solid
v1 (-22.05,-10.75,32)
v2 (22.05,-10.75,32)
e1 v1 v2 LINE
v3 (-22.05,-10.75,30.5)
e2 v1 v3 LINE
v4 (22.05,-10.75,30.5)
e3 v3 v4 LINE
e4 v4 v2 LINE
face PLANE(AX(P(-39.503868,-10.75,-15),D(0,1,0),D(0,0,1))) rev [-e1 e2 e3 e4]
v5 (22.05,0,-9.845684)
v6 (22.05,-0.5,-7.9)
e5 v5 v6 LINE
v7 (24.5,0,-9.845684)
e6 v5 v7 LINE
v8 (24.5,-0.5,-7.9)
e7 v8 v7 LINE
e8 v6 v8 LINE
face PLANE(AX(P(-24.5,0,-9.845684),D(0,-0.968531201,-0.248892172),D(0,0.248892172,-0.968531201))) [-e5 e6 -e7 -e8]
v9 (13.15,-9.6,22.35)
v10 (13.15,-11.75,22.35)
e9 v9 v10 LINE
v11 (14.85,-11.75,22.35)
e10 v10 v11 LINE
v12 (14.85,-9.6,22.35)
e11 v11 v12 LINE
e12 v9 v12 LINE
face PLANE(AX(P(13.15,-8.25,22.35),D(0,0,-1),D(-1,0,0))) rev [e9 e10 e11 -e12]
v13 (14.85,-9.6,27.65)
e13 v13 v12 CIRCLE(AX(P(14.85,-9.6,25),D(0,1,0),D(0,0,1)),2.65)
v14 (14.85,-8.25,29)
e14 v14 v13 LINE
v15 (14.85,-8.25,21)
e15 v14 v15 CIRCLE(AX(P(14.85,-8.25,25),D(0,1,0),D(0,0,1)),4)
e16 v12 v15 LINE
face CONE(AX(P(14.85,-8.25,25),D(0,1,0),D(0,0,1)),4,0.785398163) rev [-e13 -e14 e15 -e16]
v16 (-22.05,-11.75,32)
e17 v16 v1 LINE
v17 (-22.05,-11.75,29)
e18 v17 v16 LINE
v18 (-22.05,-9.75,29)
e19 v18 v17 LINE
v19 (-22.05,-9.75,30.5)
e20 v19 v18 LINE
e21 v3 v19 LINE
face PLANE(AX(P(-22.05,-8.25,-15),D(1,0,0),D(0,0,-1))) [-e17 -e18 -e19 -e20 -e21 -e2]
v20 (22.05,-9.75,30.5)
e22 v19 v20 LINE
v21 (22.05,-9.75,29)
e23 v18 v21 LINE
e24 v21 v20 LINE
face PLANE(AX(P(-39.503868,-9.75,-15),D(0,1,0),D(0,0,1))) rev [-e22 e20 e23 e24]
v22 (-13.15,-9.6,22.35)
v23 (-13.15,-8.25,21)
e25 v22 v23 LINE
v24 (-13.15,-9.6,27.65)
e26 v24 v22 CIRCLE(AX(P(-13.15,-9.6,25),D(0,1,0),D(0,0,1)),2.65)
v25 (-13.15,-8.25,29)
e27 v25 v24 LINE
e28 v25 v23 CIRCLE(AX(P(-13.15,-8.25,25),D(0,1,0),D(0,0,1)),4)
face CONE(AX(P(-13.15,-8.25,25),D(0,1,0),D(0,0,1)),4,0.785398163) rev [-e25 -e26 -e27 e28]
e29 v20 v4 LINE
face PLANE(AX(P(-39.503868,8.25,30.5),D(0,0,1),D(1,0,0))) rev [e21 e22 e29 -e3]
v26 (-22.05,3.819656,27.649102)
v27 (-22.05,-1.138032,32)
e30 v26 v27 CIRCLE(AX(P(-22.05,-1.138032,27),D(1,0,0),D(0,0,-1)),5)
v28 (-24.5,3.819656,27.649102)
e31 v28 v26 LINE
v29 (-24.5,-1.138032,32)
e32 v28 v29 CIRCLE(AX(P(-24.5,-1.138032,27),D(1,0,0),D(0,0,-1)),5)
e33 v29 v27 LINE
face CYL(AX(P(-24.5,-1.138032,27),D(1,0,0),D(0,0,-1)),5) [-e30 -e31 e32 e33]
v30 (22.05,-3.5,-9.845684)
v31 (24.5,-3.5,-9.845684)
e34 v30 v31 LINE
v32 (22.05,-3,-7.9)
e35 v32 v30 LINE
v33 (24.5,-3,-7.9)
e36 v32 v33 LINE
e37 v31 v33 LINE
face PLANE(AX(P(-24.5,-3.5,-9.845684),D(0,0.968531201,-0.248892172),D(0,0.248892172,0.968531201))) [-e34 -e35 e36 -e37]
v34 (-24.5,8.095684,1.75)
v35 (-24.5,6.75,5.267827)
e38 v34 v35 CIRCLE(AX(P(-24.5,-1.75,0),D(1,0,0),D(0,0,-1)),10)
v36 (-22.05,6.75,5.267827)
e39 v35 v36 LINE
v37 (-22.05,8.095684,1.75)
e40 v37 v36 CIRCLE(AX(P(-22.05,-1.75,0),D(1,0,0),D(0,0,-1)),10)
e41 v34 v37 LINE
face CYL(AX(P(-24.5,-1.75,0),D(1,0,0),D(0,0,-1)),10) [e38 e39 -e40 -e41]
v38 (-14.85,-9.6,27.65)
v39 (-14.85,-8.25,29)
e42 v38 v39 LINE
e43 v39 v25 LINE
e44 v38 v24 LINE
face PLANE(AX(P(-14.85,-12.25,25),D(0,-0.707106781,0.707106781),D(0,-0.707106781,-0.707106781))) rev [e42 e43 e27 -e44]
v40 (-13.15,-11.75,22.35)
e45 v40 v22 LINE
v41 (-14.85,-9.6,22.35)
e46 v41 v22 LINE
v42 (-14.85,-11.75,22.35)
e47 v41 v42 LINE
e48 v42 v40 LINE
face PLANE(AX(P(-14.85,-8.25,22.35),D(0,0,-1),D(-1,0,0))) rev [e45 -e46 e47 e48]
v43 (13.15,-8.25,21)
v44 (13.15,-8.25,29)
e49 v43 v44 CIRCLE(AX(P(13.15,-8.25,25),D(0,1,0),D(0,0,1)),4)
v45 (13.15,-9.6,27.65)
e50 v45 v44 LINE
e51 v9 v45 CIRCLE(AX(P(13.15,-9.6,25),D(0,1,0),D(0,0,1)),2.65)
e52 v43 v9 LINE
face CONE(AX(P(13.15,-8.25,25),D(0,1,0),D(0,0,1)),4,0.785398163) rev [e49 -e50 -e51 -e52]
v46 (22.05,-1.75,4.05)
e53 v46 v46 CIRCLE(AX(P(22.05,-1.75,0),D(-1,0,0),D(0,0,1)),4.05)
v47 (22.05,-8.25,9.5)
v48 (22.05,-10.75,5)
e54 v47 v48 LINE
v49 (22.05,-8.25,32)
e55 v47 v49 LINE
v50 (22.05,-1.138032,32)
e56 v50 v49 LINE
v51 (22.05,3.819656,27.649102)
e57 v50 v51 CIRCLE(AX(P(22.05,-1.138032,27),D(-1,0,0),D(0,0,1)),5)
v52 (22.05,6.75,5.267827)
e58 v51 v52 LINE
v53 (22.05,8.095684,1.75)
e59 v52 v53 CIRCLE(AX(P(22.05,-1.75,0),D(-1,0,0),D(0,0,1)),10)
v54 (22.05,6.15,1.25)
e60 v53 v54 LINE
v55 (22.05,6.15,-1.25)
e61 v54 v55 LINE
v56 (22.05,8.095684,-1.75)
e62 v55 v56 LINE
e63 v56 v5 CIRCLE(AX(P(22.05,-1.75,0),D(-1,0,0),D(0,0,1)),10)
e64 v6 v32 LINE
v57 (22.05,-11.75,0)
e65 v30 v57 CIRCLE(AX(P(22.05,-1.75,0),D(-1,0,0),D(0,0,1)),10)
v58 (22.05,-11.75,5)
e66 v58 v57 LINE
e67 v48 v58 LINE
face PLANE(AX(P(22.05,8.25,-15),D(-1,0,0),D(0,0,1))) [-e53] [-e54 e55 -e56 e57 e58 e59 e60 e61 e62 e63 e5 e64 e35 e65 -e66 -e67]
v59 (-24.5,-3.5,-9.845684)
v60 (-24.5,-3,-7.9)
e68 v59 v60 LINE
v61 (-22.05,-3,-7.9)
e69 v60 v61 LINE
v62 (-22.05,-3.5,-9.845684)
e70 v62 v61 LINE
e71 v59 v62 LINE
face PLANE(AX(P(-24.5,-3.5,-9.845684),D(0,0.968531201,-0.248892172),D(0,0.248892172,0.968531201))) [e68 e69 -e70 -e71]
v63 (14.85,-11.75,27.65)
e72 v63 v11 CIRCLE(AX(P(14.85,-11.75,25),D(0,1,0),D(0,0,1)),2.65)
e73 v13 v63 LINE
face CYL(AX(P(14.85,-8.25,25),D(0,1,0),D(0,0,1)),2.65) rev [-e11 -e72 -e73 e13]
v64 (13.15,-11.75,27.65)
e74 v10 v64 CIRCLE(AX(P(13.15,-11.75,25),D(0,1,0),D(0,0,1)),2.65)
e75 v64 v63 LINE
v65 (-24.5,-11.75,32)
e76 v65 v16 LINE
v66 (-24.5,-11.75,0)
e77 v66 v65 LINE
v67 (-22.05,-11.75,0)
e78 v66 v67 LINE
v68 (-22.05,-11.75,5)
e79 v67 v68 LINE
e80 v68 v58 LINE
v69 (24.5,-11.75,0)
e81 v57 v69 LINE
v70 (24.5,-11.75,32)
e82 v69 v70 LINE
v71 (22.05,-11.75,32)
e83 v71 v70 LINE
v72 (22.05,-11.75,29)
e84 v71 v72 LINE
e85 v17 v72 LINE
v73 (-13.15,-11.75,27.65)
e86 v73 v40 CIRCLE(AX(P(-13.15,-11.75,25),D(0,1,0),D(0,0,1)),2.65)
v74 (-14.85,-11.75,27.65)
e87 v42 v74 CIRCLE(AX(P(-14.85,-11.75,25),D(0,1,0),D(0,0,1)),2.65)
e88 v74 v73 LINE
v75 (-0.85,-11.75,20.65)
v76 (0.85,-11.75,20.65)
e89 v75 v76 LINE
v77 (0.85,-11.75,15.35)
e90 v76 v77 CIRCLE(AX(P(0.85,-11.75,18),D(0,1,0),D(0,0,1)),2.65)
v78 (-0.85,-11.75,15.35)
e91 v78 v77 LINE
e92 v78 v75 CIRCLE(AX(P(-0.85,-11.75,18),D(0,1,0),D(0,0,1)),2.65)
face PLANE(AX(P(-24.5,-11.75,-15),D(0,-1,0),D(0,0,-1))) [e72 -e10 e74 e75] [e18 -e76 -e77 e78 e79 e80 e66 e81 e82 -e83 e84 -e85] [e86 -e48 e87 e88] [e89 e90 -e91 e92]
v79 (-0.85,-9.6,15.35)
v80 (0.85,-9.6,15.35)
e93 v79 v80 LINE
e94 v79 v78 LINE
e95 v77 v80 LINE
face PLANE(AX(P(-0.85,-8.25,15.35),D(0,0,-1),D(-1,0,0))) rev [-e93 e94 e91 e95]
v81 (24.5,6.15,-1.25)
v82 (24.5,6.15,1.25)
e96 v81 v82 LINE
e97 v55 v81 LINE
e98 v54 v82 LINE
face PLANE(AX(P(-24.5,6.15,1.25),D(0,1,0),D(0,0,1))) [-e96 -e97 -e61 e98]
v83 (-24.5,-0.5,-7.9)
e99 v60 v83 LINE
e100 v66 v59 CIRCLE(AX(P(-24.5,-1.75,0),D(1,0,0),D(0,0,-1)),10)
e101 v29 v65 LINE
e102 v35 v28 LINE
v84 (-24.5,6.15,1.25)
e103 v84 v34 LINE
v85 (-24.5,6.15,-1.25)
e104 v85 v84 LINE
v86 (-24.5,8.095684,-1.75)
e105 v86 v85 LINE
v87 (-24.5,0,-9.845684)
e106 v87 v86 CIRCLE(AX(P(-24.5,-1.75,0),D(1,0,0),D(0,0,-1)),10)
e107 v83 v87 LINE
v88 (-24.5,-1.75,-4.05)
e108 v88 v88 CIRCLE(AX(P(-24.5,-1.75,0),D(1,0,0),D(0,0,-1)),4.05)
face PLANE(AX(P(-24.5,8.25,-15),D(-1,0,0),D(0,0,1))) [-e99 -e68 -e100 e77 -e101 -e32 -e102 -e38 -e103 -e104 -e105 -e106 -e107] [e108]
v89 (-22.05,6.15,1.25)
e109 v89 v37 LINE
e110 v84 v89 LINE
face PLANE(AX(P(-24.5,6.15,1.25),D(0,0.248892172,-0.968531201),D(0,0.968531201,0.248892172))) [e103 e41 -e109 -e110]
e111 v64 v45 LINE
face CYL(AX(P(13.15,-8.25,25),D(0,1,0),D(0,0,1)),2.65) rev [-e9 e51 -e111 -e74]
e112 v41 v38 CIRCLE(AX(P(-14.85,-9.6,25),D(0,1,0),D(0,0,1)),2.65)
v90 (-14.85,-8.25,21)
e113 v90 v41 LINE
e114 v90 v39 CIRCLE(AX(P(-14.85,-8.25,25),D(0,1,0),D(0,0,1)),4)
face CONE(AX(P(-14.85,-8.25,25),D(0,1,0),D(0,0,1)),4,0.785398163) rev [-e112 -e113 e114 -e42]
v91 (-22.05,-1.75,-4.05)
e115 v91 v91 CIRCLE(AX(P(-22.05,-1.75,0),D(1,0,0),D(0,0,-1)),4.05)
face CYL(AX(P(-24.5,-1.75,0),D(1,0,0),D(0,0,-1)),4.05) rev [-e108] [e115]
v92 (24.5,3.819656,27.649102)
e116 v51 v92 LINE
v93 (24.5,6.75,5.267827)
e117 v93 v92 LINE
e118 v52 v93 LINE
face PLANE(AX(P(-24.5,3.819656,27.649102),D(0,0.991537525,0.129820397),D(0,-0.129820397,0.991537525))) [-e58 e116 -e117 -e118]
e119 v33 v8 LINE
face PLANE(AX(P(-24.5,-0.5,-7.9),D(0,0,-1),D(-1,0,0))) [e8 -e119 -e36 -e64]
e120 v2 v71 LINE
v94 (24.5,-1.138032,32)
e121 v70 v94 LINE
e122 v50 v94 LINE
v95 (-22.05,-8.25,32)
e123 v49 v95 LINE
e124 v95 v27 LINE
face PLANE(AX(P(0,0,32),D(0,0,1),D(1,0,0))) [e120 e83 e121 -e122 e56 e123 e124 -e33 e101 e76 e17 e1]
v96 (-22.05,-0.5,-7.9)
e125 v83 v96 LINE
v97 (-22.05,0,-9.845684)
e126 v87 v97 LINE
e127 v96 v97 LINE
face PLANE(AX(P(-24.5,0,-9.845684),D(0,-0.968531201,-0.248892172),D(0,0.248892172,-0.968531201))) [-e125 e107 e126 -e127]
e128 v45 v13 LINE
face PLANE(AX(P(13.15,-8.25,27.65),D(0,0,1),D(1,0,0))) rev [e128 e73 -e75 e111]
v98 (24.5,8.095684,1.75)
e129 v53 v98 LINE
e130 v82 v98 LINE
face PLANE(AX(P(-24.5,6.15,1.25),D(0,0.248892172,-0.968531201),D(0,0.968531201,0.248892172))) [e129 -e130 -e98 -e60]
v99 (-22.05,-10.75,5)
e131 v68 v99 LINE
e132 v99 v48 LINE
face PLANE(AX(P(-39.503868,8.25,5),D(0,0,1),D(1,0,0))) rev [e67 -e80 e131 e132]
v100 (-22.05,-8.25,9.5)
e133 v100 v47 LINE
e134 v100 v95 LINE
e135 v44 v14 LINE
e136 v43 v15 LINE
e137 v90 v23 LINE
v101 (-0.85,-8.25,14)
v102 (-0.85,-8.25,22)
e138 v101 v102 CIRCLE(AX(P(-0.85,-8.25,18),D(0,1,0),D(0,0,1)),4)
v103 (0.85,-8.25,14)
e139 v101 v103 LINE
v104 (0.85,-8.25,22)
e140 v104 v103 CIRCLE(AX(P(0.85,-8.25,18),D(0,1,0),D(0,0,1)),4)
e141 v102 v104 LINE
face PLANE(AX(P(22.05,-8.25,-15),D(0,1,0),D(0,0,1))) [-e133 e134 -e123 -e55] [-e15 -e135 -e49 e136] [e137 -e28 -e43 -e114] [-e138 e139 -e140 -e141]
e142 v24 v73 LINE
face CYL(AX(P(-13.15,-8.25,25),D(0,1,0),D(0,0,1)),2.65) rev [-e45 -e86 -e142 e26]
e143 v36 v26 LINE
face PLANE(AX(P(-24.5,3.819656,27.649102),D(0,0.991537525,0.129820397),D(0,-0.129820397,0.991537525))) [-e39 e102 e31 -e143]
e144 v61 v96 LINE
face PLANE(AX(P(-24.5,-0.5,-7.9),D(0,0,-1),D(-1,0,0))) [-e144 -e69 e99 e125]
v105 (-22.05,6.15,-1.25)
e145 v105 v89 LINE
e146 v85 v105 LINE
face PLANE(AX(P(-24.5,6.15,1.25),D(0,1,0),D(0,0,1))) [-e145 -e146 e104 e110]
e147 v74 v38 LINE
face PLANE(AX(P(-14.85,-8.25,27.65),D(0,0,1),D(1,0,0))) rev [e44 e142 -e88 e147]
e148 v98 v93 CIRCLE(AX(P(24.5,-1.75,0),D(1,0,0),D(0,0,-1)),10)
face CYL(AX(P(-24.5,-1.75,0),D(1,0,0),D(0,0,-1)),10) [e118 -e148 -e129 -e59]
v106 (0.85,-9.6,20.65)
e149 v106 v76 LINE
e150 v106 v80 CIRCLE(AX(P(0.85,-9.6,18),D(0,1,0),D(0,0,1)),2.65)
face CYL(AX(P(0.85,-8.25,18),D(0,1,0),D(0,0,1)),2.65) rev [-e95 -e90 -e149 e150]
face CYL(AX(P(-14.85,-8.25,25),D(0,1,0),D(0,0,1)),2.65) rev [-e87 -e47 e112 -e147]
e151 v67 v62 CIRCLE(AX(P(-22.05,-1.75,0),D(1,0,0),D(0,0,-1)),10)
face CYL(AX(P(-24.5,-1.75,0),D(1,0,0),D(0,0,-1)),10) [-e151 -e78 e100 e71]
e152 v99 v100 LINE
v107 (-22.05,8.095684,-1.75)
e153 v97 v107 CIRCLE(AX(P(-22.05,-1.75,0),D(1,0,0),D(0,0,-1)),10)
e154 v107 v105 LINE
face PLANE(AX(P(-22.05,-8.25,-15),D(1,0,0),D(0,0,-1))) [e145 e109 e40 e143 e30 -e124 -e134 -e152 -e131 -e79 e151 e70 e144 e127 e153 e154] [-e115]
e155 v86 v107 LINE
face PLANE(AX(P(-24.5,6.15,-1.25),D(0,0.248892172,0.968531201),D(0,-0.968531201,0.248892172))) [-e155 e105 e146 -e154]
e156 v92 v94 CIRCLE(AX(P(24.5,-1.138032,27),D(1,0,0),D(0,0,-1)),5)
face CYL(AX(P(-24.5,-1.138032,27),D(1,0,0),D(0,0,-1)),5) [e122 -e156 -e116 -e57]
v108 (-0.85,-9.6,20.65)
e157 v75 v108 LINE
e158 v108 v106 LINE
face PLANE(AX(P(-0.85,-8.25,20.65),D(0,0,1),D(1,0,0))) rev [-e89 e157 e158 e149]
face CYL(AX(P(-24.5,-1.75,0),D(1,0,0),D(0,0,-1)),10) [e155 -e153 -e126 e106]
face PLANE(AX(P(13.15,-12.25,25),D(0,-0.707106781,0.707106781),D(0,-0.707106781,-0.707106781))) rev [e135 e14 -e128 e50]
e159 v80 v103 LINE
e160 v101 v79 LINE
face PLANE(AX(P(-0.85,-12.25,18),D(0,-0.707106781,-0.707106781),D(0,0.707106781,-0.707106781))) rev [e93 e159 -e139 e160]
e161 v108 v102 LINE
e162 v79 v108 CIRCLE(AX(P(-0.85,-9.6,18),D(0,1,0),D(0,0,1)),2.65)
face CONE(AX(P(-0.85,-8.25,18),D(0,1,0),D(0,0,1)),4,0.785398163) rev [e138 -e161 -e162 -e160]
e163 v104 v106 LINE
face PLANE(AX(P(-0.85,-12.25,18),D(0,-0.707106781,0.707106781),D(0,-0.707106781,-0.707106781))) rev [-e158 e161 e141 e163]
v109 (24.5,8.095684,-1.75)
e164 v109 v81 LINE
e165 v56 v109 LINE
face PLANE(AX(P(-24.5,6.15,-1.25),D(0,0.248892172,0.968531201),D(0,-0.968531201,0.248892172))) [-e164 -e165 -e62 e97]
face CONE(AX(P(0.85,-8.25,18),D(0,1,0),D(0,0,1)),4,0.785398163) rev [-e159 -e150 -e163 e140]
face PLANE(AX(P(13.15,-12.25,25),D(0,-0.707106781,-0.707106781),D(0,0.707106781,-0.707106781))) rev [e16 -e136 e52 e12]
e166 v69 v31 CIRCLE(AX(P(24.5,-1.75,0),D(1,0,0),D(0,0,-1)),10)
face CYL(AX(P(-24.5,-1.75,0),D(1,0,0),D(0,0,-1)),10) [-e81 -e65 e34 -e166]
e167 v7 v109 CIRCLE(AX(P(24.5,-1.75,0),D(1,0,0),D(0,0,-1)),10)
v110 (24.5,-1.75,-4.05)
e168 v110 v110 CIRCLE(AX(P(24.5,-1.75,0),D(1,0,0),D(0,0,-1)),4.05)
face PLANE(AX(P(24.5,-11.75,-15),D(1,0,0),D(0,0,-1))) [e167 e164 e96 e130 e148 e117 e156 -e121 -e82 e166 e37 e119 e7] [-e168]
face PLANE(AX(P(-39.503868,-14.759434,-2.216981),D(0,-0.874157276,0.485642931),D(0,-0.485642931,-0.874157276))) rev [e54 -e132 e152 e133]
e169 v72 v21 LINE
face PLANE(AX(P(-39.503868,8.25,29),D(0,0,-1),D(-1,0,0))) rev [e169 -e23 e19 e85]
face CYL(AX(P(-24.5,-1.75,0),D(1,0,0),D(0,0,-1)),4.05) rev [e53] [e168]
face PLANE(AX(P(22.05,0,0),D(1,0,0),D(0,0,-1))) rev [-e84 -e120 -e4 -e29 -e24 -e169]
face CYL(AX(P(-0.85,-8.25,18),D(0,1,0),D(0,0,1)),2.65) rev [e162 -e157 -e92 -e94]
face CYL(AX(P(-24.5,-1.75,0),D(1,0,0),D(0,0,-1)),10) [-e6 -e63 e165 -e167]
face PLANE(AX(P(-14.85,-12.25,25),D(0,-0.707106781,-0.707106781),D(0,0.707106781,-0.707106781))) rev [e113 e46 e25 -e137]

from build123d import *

# Parameters (mm, degrees)
BODY_DEPTH                       = 32
BODY_DEPTH_BACK                  = 15
PIVOT_HOLE_DEPTH                 = 42.979905907
PIVOT_HOLE_DEPTH_BACK            = 42.979905907
PIVOT_HOLE_SKETCH_R              = 4.05
OUTSIDE_SHAPE_CUT_OUT_DEPTH      = 42.979905907
OUTSIDE_SHAPE_CUT_OUT_DEPTH_BACK = 42.979905907
OUTSIDE_SHAPE_CUT_OUT_SKETCH_W   = 49
OUTSIDE_SHAPE_CUT_OUT_SKETCH_H   = 22
INSIDE_START                     = 22.05
INSIDE_SHAPE_CUT_OUT_DEPTH       = 44.1
F_3_START                        = -11.75
F_3_M5_SLOTS_DEPTH               = 3.5


with BuildPart() as part:
    # Profile Sketch → Body (new, two sides: drawn at the far end of the back side and taken through both)
    with BuildSketch(Plane.XY.offset(-BODY_DEPTH_BACK)):
        Polygon((-24.5, -11.75), (24.5, -11.75), (24.5, 8.25), (22.05, 8.25), (22.05, -8.25), (-22.05, -8.25), (-22.05, 8.25), (-24.5, 8.25), align=None)
    extrude(amount=BODY_DEPTH + BODY_DEPTH_BACK)

    # Pivot Hole Sketch → Pivot Hole (cut, two sides: drawn at the far end of the back side and taken through both)
    with BuildSketch(Plane(origin=(0, 0, 0), x_dir=(0, 0, -1), z_dir=(1, 0, 0)).offset(-PIVOT_HOLE_DEPTH_BACK)):
        with Locations((0, -1.75)):
            Circle(PIVOT_HOLE_SKETCH_R)
    extrude(amount=PIVOT_HOLE_DEPTH + PIVOT_HOLE_DEPTH_BACK, mode=Mode.SUBTRACT)

    # Outside Shape Cut Out Sketch → Outside Shape Cut Out (cut, two sides: drawn at the far end of the back side and taken through both)
    with BuildSketch(Plane(origin=(0, 0, 0), x_dir=(0, 0, -1), z_dir=(1, 0, 0)).offset(-OUTSIDE_SHAPE_CUT_OUT_DEPTH_BACK)):
        with Locations((-9.5, -2.75)):
            Rectangle(OUTSIDE_SHAPE_CUT_OUT_SKETCH_W, OUTSIDE_SHAPE_CUT_OUT_SKETCH_H)
        with BuildLine():
            Line((-27.649101987, 3.819656009), (-5.267826876, 6.75))
            ThreePointArc((-5.267826876, 6.75), (-3.57284062, 7.589957703), (-1.75, 8.095684334))
            Line((-1.75, 8.095684334), (-1.25, 6.15))
            Line((-1.25, 6.15), (1.25, 6.15))
            Line((1.25, 6.15), (1.75, 8.095684334))
            ThreePointArc((1.75, 8.095684334), (7.071067812, 5.321067812), (9.845684334, 0))
            Line((9.845684334, 0), (7.9, -0.5))
            Line((7.9, -0.5), (7.9, -3))
            Line((7.9, -3), (9.845684334, -3.5))
            ThreePointArc((9.845684334, -3.5), (6.422616289, -9.414854858), (0, -11.75))
            Line((0, -11.75), (-32, -11.75))
            Line((-32, -11.75), (-32, -1.138031619))
            ThreePointArc((-32, -1.138031619), (-30.758025408, 2.160035244), (-27.649101987, 3.819656009))
        make_face(mode=Mode.SUBTRACT)
    extrude(amount=OUTSIDE_SHAPE_CUT_OUT_DEPTH + OUTSIDE_SHAPE_CUT_OUT_DEPTH_BACK, mode=Mode.SUBTRACT)

    # Inside Shape Cut Out Sketch → Inside Shape Cut Out (cut)
    with BuildSketch(Plane(origin=(0, 0, 0), x_dir=(0, 0, -1), z_dir=(1, 0, 0)).offset(INSIDE_START)):
        Polygon((-29, -9.75), (-29, -11.75), (-32, -11.75), (-32, -10.75), (-30.5, -10.75), (-30.5, -9.75), align=None)
        Polygon((-9.5, -8.25), (-5, -10.75), (-5, -11.75), (7.599342077, -11.75), (7.599342077, -8.25), align=None)
    extrude(amount=-INSIDE_SHAPE_CUT_OUT_DEPTH, mode=Mode.SUBTRACT)

    # 3 M5 Slots: read off the stored shape, not the designer's step
    # 3 M5 Slots outline → 3 M5 Slots (cut)
    with BuildSketch(Plane(origin=(0, 0, 0), x_dir=(1, 0, 0), z_dir=(0, 1, 0)).offset(F_3_START)):
        with BuildLine():
            Line((-0.85, -20.65), (0.85, -20.65))
            ThreePointArc((0.85, -20.65), (3.5, -18), (0.85, -15.35))
            Line((0.85, -15.35), (-0.85, -15.35))
            ThreePointArc((-0.85, -15.35), (-3.5, -18), (-0.85, -20.65))
        make_face()
        with BuildLine():
            Line((13.15, -27.65), (14.85, -27.65))
            ThreePointArc((14.85, -27.65), (17.5, -25), (14.85, -22.35))
            Line((14.85, -22.35), (13.15, -22.35))
            ThreePointArc((13.15, -22.35), (10.5, -25), (13.15, -27.65))
        make_face()
        with BuildLine():
            ThreePointArc((-13.15, -27.65), (-10.5, -25), (-13.15, -22.35))
            Line((-13.15, -22.35), (-14.85, -22.35))
            ThreePointArc((-14.85, -22.35), (-17.5, -25), (-14.85, -27.65))
            Line((-14.85, -27.65), (-13.15, -27.65))
        make_face()
    extrude(amount=F_3_M5_SLOTS_DEPTH, mode=Mode.SUBTRACT)

    # 3 M5 Slots 2: loft between two sections, ruled curve by curve
    f_3_m5_slots_2_from = [
        Edge.make_three_point_arc((0.85, -9.6, 20.65), (2.72383297, -9.6, 19.87383297), (3.5, -9.6, 18)),
        Edge.make_three_point_arc((3.5, -9.6, 18), (2.72383297, -9.6, 16.12616703), (0.85, -9.6, 15.35)),
        Edge.make_three_point_arc((-0.85, -9.6, 15.35), (-2.72383297, -9.6, 16.12616703), (-3.5, -9.6, 18)),
        Edge.make_three_point_arc((-3.5, -9.6, 18), (-2.72383297, -9.6, 19.87383297), (-0.85, -9.6, 20.65)),
        Edge.make_line((0.85, -9.6, 15.35), (-0.85, -9.6, 15.35)),
        Edge.make_line((0.85, -9.6, 20.65), (-0.85, -9.6, 20.65)),
    ]
    f_3_m5_slots_2_to = [
        Edge.make_three_point_arc((0.85, -8.25, 22), (3.678427125, -8.25, 20.828427125), (4.85, -8.25, 18)),
        Edge.make_three_point_arc((4.85, -8.25, 18), (3.678427125, -8.25, 15.171572875), (0.85, -8.25, 14)),
        Edge.make_three_point_arc((-0.85, -8.25, 14), (-3.678427125, -8.25, 15.171572875), (-4.85, -8.25, 18)),
        Edge.make_three_point_arc((-4.85, -8.25, 18), (-3.678427125, -8.25, 20.828427125), (-0.85, -8.25, 22)),
        Edge.make_line((0.85, -8.25, 14), (-0.85, -8.25, 14)),
        Edge.make_line((0.85, -8.25, 22), (-0.85, -8.25, 22)),
    ]
    f_3_m5_slots_2 = Solid(Shell([*[Face.make_surface_from_curves(f_3_m5_slots_2_from[k], f_3_m5_slots_2_to[k]) for k in range(6)], Face(Wire(f_3_m5_slots_2_from)), Face(Wire(f_3_m5_slots_2_to))]))
    add(f_3_m5_slots_2, mode=Mode.SUBTRACT)

    # 3 M5 Slots 3: loft between two sections, ruled curve by curve
    f_3_m5_slots_3_from = [
        Edge.make_three_point_arc((14.85, -9.6, 27.65), (16.72383297, -9.6, 26.87383297), (17.5, -9.6, 25)),
        Edge.make_three_point_arc((17.5, -9.6, 25), (16.72383297, -9.6, 23.12616703), (14.85, -9.6, 22.35)),
        Edge.make_three_point_arc((13.15, -9.6, 22.35), (11.27616703, -9.6, 23.12616703), (10.5, -9.6, 25)),
        Edge.make_three_point_arc((10.5, -9.6, 25), (11.27616703, -9.6, 26.87383297), (13.15, -9.6, 27.65)),
        Edge.make_line((14.85, -9.6, 22.35), (13.15, -9.6, 22.35)),
        Edge.make_line((14.85, -9.6, 27.65), (13.15, -9.6, 27.65)),
    ]
    f_3_m5_slots_3_to = [
        Edge.make_three_point_arc((14.85, -8.25, 29), (17.678427125, -8.25, 27.828427125), (18.85, -8.25, 25)),
        Edge.make_three_point_arc((18.85, -8.25, 25), (17.678427125, -8.25, 22.171572875), (14.85, -8.25, 21)),
        Edge.make_three_point_arc((13.15, -8.25, 21), (10.321572875, -8.25, 22.171572875), (9.15, -8.25, 25)),
        Edge.make_three_point_arc((9.15, -8.25, 25), (10.321572875, -8.25, 27.828427125), (13.15, -8.25, 29)),
        Edge.make_line((14.85, -8.25, 21), (13.15, -8.25, 21)),
        Edge.make_line((14.85, -8.25, 29), (13.15, -8.25, 29)),
    ]
    f_3_m5_slots_3 = Solid(Shell([*[Face.make_surface_from_curves(f_3_m5_slots_3_from[k], f_3_m5_slots_3_to[k]) for k in range(6)], Face(Wire(f_3_m5_slots_3_from)), Face(Wire(f_3_m5_slots_3_to))]))
    add(f_3_m5_slots_3, mode=Mode.SUBTRACT)

    # 3 M5 Slots 4: loft between two sections, ruled curve by curve
    f_3_m5_slots_4_from = [
        Edge.make_three_point_arc((-13.15, -9.6, 27.65), (-11.27616703, -9.6, 26.87383297), (-10.5, -9.6, 25)),
        Edge.make_three_point_arc((-10.5, -9.6, 25), (-11.27616703, -9.6, 23.12616703), (-13.15, -9.6, 22.35)),
        Edge.make_three_point_arc((-14.85, -9.6, 22.35), (-16.72383297, -9.6, 23.12616703), (-17.5, -9.6, 25)),
        Edge.make_three_point_arc((-17.5, -9.6, 25), (-16.72383297, -9.6, 26.87383297), (-14.85, -9.6, 27.65)),
        Edge.make_line((-13.15, -9.6, 22.35), (-14.85, -9.6, 22.35)),
        Edge.make_line((-13.15, -9.6, 27.65), (-14.85, -9.6, 27.65)),
    ]
    f_3_m5_slots_4_to = [
        Edge.make_three_point_arc((-13.15, -8.25, 29), (-10.321572875, -8.25, 27.828427125), (-9.15, -8.25, 25)),
        Edge.make_three_point_arc((-9.15, -8.25, 25), (-10.321572875, -8.25, 22.171572875), (-13.15, -8.25, 21)),
        Edge.make_three_point_arc((-14.85, -8.25, 21), (-17.678427125, -8.25, 22.171572875), (-18.85, -8.25, 25)),
        Edge.make_three_point_arc((-18.85, -8.25, 25), (-17.678427125, -8.25, 27.828427125), (-14.85, -8.25, 29)),
        Edge.make_line((-13.15, -8.25, 21), (-14.85, -8.25, 21)),
        Edge.make_line((-13.15, -8.25, 29), (-14.85, -8.25, 29)),
    ]
    f_3_m5_slots_4 = Solid(Shell([*[Face.make_surface_from_curves(f_3_m5_slots_4_from[k], f_3_m5_slots_4_to[k]) for k in range(6)], Face(Wire(f_3_m5_slots_4_from)), Face(Wire(f_3_m5_slots_4_to))]))
    add(f_3_m5_slots_4, mode=Mode.SUBTRACT)


solid = part.part
